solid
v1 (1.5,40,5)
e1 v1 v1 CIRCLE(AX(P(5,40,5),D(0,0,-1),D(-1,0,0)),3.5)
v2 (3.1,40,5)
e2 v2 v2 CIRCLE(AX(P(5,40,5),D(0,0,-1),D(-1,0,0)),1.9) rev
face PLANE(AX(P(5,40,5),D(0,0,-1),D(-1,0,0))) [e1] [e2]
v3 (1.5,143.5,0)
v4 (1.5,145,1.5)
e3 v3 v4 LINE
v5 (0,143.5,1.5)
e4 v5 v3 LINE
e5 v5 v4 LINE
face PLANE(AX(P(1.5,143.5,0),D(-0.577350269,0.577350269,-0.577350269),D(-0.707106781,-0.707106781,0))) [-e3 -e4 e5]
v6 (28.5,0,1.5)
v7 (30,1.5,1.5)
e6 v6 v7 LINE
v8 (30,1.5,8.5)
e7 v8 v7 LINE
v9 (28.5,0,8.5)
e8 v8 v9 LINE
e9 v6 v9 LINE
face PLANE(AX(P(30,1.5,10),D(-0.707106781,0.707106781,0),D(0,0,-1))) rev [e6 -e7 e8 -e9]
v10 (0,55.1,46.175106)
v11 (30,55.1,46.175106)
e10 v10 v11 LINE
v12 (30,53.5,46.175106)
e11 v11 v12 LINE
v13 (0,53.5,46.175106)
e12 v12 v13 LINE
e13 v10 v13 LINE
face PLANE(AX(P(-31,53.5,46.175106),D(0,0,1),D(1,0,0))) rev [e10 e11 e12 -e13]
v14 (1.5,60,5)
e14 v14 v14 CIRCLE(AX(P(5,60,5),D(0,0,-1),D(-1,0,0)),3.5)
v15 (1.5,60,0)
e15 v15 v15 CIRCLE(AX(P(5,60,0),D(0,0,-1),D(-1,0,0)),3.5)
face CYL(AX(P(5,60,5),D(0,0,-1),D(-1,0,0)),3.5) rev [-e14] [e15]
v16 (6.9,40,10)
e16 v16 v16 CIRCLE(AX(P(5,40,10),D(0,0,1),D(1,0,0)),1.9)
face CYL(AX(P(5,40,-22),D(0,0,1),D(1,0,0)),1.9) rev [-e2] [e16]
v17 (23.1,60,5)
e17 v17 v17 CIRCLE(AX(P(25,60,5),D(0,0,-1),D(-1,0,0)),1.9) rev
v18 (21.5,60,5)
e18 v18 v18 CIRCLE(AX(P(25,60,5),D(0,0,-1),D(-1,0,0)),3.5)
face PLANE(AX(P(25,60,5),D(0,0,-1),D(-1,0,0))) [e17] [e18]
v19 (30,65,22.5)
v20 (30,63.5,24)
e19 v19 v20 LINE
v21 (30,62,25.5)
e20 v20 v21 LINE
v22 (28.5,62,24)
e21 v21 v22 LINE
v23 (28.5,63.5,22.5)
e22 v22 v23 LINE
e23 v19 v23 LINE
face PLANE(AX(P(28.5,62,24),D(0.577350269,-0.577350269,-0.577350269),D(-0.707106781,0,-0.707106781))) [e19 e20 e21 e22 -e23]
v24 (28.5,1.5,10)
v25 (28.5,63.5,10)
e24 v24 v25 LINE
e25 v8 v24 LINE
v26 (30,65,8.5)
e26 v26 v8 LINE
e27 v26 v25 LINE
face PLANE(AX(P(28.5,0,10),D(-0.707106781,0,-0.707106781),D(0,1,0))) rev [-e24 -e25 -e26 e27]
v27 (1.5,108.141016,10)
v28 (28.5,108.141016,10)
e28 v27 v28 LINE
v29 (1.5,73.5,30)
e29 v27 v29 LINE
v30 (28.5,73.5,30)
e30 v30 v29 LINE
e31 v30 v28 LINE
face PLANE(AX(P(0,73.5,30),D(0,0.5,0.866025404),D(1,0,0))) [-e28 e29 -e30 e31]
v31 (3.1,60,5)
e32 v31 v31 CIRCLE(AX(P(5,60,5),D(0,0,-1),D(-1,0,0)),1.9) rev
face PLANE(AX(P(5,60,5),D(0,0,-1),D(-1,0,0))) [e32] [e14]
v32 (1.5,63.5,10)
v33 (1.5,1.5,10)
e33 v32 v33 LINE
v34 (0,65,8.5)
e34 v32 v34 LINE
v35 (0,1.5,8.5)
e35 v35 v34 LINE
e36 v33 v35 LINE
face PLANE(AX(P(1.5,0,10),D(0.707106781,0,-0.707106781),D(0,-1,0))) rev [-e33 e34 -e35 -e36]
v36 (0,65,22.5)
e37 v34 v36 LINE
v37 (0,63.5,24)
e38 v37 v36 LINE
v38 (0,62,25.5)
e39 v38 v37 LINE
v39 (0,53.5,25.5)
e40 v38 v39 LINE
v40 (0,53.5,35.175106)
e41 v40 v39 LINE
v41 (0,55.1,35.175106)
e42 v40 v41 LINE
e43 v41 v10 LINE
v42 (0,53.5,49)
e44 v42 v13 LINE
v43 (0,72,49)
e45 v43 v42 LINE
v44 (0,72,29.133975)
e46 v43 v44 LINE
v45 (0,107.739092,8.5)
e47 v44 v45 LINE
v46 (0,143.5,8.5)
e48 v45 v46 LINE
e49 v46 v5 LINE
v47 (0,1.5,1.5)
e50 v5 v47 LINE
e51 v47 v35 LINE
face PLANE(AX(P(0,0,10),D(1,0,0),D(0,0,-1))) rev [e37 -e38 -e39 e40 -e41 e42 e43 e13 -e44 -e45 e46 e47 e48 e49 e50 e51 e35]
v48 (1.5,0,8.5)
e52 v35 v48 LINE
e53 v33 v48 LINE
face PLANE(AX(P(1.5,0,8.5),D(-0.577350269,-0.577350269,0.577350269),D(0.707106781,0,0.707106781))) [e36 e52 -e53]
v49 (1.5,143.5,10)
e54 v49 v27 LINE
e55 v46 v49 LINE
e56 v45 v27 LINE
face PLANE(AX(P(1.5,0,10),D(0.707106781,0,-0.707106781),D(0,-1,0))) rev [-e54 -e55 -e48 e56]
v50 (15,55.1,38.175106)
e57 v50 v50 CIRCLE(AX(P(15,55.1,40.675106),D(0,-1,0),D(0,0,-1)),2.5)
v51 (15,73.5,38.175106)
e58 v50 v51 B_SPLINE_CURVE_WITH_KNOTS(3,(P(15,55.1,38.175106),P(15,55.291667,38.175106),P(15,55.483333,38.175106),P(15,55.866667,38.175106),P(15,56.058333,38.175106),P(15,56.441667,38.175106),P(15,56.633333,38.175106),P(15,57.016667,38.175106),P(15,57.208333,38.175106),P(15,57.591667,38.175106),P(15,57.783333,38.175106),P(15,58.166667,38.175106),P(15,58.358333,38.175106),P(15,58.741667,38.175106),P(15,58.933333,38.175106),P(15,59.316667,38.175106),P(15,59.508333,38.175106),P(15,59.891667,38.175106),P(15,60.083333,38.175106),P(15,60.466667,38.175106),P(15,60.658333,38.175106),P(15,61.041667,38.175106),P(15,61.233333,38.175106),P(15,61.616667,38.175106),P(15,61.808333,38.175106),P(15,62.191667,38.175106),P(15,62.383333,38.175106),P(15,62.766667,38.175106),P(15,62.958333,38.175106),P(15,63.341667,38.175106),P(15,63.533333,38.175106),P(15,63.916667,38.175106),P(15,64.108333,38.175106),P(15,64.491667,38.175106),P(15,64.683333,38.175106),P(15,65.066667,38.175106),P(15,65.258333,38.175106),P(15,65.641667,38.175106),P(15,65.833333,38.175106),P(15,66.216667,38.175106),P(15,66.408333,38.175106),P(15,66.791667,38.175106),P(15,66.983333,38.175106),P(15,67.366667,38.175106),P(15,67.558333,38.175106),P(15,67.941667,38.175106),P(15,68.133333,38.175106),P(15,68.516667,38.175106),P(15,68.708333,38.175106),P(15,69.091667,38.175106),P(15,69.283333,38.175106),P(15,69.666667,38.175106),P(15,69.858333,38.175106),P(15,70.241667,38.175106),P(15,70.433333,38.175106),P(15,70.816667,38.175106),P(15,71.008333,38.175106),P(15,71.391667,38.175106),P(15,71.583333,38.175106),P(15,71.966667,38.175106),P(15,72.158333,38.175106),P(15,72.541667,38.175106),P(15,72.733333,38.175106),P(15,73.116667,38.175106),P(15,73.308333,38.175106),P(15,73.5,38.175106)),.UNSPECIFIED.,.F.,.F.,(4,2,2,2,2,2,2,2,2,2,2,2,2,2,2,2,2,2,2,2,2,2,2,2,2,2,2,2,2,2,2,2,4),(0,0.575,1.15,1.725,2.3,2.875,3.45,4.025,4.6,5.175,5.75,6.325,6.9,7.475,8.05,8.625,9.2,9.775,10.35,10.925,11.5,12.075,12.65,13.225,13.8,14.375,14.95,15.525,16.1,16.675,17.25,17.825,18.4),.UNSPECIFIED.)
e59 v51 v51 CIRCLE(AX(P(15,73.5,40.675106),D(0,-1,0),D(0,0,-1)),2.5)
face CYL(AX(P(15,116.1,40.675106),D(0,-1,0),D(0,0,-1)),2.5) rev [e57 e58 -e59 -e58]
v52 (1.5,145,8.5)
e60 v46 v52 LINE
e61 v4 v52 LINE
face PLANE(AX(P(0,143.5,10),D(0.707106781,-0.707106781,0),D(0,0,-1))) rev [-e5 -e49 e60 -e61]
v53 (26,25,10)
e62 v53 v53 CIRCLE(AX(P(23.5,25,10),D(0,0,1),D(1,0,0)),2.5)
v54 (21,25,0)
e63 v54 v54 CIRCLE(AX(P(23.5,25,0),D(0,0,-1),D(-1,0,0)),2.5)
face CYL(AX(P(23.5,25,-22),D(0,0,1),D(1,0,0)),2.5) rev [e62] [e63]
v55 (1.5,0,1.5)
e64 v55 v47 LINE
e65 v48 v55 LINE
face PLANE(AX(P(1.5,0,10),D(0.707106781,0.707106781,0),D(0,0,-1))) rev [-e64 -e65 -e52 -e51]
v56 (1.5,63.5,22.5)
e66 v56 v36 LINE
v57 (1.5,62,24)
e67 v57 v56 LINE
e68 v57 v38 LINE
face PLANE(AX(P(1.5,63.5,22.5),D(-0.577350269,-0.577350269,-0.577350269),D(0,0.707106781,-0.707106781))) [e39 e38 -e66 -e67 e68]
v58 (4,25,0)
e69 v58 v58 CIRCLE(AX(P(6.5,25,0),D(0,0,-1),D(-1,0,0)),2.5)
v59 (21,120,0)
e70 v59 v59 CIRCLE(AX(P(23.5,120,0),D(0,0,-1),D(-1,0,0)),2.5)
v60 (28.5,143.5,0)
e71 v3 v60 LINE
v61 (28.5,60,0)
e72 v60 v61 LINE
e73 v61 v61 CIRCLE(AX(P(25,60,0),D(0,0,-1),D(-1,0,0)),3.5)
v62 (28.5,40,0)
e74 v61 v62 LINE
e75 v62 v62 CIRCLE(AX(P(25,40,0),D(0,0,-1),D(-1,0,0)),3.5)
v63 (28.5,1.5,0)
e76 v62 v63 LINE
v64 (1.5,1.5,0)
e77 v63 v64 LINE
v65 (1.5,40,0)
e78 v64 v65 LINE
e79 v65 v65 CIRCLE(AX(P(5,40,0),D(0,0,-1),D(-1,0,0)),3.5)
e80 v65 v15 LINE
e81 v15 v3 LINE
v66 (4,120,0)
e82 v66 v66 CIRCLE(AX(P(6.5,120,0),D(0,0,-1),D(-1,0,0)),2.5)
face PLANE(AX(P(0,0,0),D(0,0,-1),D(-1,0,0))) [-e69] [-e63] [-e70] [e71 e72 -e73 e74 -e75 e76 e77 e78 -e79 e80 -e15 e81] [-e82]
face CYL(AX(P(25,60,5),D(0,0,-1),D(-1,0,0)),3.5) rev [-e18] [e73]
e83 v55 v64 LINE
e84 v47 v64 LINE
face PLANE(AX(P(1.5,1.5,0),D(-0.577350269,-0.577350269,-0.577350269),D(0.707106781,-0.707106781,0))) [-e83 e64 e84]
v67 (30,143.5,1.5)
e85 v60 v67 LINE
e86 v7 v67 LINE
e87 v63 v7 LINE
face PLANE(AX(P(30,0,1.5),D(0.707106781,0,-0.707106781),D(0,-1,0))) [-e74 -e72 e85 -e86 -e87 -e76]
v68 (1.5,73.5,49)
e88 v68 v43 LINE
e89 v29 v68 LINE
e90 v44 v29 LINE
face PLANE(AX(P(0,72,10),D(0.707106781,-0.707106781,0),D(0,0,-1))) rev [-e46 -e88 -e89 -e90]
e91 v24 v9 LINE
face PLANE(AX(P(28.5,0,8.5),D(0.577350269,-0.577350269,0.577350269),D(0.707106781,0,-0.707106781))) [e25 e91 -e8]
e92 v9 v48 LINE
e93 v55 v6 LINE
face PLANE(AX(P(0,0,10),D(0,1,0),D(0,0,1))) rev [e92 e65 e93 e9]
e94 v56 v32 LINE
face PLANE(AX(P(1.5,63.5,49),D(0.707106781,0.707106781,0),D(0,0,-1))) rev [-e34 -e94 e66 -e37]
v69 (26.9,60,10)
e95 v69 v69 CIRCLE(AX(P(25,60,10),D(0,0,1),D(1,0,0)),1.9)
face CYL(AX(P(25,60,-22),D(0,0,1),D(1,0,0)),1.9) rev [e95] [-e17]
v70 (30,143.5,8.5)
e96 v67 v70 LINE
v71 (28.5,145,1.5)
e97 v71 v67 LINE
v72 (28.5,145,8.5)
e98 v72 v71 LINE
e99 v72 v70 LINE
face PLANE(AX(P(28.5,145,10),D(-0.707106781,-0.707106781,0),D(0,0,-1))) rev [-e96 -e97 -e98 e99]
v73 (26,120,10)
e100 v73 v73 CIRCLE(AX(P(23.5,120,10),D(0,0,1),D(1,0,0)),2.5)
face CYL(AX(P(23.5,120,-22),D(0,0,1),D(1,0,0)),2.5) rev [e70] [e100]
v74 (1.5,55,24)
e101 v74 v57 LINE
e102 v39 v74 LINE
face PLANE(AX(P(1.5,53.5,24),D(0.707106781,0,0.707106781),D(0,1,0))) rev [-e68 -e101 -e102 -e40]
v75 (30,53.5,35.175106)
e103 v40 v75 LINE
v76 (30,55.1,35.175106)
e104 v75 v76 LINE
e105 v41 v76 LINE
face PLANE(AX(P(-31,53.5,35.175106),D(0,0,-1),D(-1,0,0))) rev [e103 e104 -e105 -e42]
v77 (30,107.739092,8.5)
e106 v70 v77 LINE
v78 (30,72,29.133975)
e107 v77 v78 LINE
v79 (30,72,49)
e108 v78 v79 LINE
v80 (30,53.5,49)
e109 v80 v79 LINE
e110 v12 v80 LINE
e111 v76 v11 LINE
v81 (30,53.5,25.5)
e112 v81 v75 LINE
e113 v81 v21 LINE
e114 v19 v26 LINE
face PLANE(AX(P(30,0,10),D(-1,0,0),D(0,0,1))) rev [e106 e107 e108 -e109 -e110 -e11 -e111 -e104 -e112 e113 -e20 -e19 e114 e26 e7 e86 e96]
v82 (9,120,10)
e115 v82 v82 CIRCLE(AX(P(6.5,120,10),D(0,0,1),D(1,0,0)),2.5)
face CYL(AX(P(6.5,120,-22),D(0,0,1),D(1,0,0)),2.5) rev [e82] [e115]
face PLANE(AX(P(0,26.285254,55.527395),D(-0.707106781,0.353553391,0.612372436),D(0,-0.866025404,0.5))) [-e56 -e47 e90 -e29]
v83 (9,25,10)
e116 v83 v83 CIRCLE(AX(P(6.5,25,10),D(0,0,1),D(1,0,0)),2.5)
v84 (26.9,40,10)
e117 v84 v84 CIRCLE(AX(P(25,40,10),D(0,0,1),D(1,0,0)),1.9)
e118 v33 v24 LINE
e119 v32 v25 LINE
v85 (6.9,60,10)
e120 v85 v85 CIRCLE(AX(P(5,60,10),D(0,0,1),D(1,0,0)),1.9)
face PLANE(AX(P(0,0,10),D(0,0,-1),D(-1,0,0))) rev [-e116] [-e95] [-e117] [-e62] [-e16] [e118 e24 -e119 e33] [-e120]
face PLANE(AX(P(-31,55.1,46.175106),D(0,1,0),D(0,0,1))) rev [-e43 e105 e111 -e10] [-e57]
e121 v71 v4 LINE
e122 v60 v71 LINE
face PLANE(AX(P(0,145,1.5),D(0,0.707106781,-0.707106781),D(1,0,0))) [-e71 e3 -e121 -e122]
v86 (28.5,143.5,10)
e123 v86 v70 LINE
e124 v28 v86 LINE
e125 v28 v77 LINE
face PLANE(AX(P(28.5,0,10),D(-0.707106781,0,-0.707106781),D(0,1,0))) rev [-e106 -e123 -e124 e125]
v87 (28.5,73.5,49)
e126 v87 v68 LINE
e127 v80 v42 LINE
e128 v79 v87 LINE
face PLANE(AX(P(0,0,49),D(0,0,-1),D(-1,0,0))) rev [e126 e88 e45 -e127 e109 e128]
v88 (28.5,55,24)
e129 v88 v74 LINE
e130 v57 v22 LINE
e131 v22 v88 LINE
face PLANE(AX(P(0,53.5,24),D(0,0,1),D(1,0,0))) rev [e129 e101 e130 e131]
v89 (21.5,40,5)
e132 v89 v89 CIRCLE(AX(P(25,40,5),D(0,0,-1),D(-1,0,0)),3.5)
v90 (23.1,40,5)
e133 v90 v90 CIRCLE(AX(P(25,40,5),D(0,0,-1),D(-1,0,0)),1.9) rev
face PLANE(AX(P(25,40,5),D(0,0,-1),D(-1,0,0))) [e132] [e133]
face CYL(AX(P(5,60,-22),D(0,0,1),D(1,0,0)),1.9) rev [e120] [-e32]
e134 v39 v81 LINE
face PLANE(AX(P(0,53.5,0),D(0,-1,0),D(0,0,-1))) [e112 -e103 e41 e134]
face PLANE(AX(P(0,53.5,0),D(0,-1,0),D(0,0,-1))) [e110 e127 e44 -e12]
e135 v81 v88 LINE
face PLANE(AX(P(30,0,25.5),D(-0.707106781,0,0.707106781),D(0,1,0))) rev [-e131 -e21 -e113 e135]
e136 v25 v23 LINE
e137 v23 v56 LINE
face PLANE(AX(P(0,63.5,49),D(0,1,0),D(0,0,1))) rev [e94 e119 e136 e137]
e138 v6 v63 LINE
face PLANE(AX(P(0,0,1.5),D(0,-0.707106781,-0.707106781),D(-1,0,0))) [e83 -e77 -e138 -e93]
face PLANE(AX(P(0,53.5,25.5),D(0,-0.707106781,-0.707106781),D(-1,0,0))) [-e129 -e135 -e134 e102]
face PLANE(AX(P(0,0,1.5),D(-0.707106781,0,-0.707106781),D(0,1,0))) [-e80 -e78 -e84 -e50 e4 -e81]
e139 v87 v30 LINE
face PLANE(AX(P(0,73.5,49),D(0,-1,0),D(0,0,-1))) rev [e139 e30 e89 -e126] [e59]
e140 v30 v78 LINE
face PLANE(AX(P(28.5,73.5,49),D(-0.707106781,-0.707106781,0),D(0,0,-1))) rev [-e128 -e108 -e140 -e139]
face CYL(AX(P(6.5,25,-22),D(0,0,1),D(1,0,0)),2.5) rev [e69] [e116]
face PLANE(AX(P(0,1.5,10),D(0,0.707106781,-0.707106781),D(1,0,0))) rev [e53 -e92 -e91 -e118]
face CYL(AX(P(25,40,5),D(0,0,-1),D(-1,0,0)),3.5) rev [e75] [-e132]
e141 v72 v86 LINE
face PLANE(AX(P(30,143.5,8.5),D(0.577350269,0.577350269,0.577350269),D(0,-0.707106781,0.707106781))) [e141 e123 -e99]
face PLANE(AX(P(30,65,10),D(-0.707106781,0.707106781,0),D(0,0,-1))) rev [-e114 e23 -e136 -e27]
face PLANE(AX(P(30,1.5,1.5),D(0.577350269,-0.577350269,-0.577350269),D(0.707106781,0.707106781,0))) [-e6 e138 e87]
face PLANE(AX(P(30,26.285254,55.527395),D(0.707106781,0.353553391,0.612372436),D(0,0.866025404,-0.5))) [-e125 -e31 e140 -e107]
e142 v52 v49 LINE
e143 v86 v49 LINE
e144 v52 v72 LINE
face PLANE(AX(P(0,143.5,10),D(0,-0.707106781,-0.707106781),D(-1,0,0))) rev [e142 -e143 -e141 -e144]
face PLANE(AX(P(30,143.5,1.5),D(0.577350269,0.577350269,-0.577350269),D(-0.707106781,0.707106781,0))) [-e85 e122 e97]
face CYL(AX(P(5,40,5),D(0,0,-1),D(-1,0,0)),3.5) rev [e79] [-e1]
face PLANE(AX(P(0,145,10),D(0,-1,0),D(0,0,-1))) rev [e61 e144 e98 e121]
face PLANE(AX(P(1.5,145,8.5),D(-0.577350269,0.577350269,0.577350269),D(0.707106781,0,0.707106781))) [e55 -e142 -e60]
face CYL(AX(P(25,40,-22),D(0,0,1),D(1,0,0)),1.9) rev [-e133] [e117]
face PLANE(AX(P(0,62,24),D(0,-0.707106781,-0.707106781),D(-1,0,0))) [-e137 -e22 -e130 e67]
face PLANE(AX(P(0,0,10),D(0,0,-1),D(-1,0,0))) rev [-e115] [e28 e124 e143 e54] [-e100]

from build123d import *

# Parameters (mm, degrees)
SKETCH1_W           = 30
SKETCH1_H           = 145
BOSS_EXTRUDE1_DEPTH = 10
CUT_EXTRUDE1_DEPTH  = 32
CUT_EXTRUDE2_DEPTH  = 32
SKETCH4_R           = 3.5
CUT_EXTRUDE3_DEPTH  = 5
SKETCH5_W           = 30
SKETCH5_H           = 10
BOSS_EXTRUDE2_DEPTH = 39
SKETCH6_W           = 30
SKETCH6_H           = 25
BOSS_EXTRUDE3_DEPTH = 10
SKETCH7_W           = 11
SKETCH7_H           = 1.6
CUT_EXTRUDE4_DEPTH  = 61
SKETCH8_R           = 2.5
CUT_EXTRUDE5_DEPTH  = 61
CHAMFER1_SIZE       = 20
CHAMFER1_SIZE2      = 34.641016151
CHAMFER2_SIZE       = 1.5


with BuildPart() as part:
    # Sketch1 → Boss-Extrude1 (new body)
    with BuildSketch(Plane.XY):
        with Locations((15, 72.5)):
            Rectangle(SKETCH1_W, SKETCH1_H)
    extrude(amount=BOSS_EXTRUDE1_DEPTH)

    # Sketch2 → Cut-Extrude1 (cut)
    with BuildSketch(Plane.XY.offset(10)):
        with BuildLine():
            Line((6.5, 117.5), (6.5, 120))
            Line((6.5, 120), (9, 120))
            ThreePointArc((9, 120), (4.732233047, 121.767766953), (6.5, 117.5))
        make_face()
        with BuildLine():
            Line((9, 120), (6.5, 120))
            Line((6.5, 120), (6.5, 117.5))
            ThreePointArc((6.5, 117.5), (8.267766953, 118.232233047), (9, 120))
        make_face()
        with BuildLine():
            ThreePointArc((26, 120), (23.5, 122.5), (21, 120))
            Line((21, 120), (23.5, 120))
            Line((23.5, 120), (23.5, 117.5))
            ThreePointArc((23.5, 117.5), (25.267766953, 118.232233047), (26, 120))
        make_face()
        with BuildLine():
            Line((23.5, 120), (21, 120))
            ThreePointArc((21, 120), (21.732233047, 118.232233047), (23.5, 117.5))
            Line((23.5, 117.5), (23.5, 120))
        make_face()
        with BuildLine():
            ThreePointArc((26, 25), (25.267766953, 26.767766953), (23.5, 27.5))
            Line((23.5, 27.5), (23.5, 25))
            Line((23.5, 25), (21, 25))
            ThreePointArc((21, 25), (23.5, 22.5), (26, 25))
        make_face()
        with BuildLine():
            Line((23.5, 25), (23.5, 27.5))
            ThreePointArc((23.5, 27.5), (21.732233047, 26.767766953), (21, 25))
            Line((21, 25), (23.5, 25))
        make_face()
        with BuildLine():
            ThreePointArc((9, 25), (8.267766953, 26.767766953), (6.5, 27.5))
            Line((6.5, 27.5), (6.5, 25))
            Line((6.5, 25), (9, 25))
        make_face()
        with BuildLine():
            Line((6.5, 25), (6.5, 27.5))
            ThreePointArc((6.5, 27.5), (4.732233047, 23.232233047), (9, 25))
            Line((9, 25), (6.5, 25))
        make_face()
    extrude(amount=-CUT_EXTRUDE1_DEPTH, mode=Mode.SUBTRACT)

    # Sketch3 → Cut-Extrude2 (cut)
    with BuildSketch(Plane.XY.offset(10)):
        with BuildLine():
            ThreePointArc((6.9, 60), (3.656497116, 61.343502884), (5, 58.1))
            Line((5, 58.1), (5, 60))
            Line((5, 60), (6.9, 60))
        make_face()
        with BuildLine():
            Line((5, 60), (5, 58.1))
            ThreePointArc((5, 58.1), (6.343502884, 58.656497116), (6.9, 60))
            Line((6.9, 60), (5, 60))
        make_face()
        with BuildLine():
            ThreePointArc((23.1, 60), (23.656497116, 58.656497116), (25, 58.1))
            Line((25, 58.1), (25, 60))
            Line((25, 60), (23.1, 60))
        make_face()
        with BuildLine():
            Line((25, 60), (25, 58.1))
            ThreePointArc((25, 58.1), (26.343502884, 58.656497116), (26.9, 60))
            ThreePointArc((26.9, 60), (25, 61.9), (23.1, 60))
            Line((23.1, 60), (25, 60))
        make_face()
        with BuildLine():
            Line((5, 41.9), (5, 40))
            Line((5, 40), (6.9, 40))
            ThreePointArc((6.9, 40), (6.343502884, 41.343502884), (5, 41.9))
        make_face()
        with BuildLine():
            Line((6.9, 40), (5, 40))
            Line((5, 40), (5, 41.9))
            ThreePointArc((5, 41.9), (3.656497116, 38.656497116), (6.9, 40))
        make_face()
        with BuildLine():
            ThreePointArc((25, 41.9), (23.656497116, 41.343502884), (23.1, 40))
            Line((23.1, 40), (25, 40))
            Line((25, 40), (25, 41.9))
        make_face()
        with BuildLine():
            Line((25, 40), (23.1, 40))
            ThreePointArc((23.1, 40), (25, 38.1), (26.9, 40))
            ThreePointArc((26.9, 40), (26.343502884, 41.343502884), (25, 41.9))
            Line((25, 41.9), (25, 40))
        make_face()
    extrude(amount=-CUT_EXTRUDE2_DEPTH, mode=Mode.SUBTRACT)

    # Sketch4 → Cut-Extrude3 (cut)
    with BuildSketch(Plane(origin=(0, 0, 0), x_dir=(-1, 0, 0), z_dir=(0, 0, -1))):
        with Locations((-5, 60)):
            Circle(SKETCH4_R)
        with Locations((-5, 40)):
            Circle(SKETCH4_R)
        with Locations((-25, 40)):
            Circle(SKETCH4_R)
        with Locations((-25, 60)):
            Circle(SKETCH4_R)
    extrude(amount=-CUT_EXTRUDE3_DEPTH, mode=Mode.SUBTRACT)

    # Sketch5 → Boss-Extrude2 (add)
    with BuildSketch(Plane.XY.offset(10)):
        with Locations((15, 68.5)):
            Rectangle(SKETCH5_W, SKETCH5_H)
    extrude(amount=BOSS_EXTRUDE2_DEPTH)

    # Sketch6 → Boss-Extrude3 (add)
    with BuildSketch(Plane.XZ.offset(-63.5)):
        with Locations((15, 36.5)):
            Rectangle(SKETCH6_W, SKETCH6_H)
    extrude(amount=BOSS_EXTRUDE3_DEPTH)

    # Sketch7 → Cut-Extrude4 (cut)
    with BuildSketch(Plane(origin=(30, 0, 0), x_dir=(0, 0, -1), z_dir=(1, 0, 0))):
        with Locations((-40.675105606, 54.3)):
            Rectangle(SKETCH7_W, SKETCH7_H)
    extrude(amount=-CUT_EXTRUDE4_DEPTH, mode=Mode.SUBTRACT)

    # Sketch8 → Cut-Extrude5 (cut)
    with BuildSketch(Plane.XZ.offset(-55.1)):
        with Locations(Location((15, 40.675105606, 0), (0, 0, 270))):
            Circle(SKETCH8_R)
    extrude(amount=-CUT_EXTRUDE5_DEPTH, mode=Mode.SUBTRACT)

    # Chamfer1
    chamfer1_edges = [part.edges().sort_by_distance(p)[0] for p in [
        (15, 73.5, 10),
    ]]
    chamfer1_side = [part.faces().sort_by_distance(p)[0] for p in [
        (15, 73.5, 29.309258212),
    ]]
    chamfer(chamfer1_edges, length=CHAMFER1_SIZE, length2=CHAMFER1_SIZE2, reference=chamfer1_side[0])

    # Chamfer2
    chamfer2_edges = [part.edges().sort_by_distance(p)[0] for p in [
        (30, 63.5, 17),
        (0, 63.5, 17),
        (15, 63.5, 24),
        (0, 58.5, 24),
        (30, 58.5, 24),
        (15, 53.5, 24),
        (30, 31.75, 10),
        (30, 126.570508076, 10),
        (0, 90.820508076, 20),
        (30, 90.820508076, 20),
        (15, 145, 10),
        (0, 126.570508076, 10),
        (15, 145, 0),
        (30, 72.5, 0),
        (15, 0, 0),
        (0, 72.5, 0),
        (0, 145, 5),
        (30, 145, 5),
        (30, 0, 5),
        (0, 0, 5),
        (15, 0, 10),
        (0, 31.75, 10),
        (0, 73.5, 39.5),
        (30, 73.5, 39.5),
    ]]
    chamfer(chamfer2_edges, length=CHAMFER2_SIZE - 0.0001)  # a hair under: the kernel refuses the full size


solid = part.part
